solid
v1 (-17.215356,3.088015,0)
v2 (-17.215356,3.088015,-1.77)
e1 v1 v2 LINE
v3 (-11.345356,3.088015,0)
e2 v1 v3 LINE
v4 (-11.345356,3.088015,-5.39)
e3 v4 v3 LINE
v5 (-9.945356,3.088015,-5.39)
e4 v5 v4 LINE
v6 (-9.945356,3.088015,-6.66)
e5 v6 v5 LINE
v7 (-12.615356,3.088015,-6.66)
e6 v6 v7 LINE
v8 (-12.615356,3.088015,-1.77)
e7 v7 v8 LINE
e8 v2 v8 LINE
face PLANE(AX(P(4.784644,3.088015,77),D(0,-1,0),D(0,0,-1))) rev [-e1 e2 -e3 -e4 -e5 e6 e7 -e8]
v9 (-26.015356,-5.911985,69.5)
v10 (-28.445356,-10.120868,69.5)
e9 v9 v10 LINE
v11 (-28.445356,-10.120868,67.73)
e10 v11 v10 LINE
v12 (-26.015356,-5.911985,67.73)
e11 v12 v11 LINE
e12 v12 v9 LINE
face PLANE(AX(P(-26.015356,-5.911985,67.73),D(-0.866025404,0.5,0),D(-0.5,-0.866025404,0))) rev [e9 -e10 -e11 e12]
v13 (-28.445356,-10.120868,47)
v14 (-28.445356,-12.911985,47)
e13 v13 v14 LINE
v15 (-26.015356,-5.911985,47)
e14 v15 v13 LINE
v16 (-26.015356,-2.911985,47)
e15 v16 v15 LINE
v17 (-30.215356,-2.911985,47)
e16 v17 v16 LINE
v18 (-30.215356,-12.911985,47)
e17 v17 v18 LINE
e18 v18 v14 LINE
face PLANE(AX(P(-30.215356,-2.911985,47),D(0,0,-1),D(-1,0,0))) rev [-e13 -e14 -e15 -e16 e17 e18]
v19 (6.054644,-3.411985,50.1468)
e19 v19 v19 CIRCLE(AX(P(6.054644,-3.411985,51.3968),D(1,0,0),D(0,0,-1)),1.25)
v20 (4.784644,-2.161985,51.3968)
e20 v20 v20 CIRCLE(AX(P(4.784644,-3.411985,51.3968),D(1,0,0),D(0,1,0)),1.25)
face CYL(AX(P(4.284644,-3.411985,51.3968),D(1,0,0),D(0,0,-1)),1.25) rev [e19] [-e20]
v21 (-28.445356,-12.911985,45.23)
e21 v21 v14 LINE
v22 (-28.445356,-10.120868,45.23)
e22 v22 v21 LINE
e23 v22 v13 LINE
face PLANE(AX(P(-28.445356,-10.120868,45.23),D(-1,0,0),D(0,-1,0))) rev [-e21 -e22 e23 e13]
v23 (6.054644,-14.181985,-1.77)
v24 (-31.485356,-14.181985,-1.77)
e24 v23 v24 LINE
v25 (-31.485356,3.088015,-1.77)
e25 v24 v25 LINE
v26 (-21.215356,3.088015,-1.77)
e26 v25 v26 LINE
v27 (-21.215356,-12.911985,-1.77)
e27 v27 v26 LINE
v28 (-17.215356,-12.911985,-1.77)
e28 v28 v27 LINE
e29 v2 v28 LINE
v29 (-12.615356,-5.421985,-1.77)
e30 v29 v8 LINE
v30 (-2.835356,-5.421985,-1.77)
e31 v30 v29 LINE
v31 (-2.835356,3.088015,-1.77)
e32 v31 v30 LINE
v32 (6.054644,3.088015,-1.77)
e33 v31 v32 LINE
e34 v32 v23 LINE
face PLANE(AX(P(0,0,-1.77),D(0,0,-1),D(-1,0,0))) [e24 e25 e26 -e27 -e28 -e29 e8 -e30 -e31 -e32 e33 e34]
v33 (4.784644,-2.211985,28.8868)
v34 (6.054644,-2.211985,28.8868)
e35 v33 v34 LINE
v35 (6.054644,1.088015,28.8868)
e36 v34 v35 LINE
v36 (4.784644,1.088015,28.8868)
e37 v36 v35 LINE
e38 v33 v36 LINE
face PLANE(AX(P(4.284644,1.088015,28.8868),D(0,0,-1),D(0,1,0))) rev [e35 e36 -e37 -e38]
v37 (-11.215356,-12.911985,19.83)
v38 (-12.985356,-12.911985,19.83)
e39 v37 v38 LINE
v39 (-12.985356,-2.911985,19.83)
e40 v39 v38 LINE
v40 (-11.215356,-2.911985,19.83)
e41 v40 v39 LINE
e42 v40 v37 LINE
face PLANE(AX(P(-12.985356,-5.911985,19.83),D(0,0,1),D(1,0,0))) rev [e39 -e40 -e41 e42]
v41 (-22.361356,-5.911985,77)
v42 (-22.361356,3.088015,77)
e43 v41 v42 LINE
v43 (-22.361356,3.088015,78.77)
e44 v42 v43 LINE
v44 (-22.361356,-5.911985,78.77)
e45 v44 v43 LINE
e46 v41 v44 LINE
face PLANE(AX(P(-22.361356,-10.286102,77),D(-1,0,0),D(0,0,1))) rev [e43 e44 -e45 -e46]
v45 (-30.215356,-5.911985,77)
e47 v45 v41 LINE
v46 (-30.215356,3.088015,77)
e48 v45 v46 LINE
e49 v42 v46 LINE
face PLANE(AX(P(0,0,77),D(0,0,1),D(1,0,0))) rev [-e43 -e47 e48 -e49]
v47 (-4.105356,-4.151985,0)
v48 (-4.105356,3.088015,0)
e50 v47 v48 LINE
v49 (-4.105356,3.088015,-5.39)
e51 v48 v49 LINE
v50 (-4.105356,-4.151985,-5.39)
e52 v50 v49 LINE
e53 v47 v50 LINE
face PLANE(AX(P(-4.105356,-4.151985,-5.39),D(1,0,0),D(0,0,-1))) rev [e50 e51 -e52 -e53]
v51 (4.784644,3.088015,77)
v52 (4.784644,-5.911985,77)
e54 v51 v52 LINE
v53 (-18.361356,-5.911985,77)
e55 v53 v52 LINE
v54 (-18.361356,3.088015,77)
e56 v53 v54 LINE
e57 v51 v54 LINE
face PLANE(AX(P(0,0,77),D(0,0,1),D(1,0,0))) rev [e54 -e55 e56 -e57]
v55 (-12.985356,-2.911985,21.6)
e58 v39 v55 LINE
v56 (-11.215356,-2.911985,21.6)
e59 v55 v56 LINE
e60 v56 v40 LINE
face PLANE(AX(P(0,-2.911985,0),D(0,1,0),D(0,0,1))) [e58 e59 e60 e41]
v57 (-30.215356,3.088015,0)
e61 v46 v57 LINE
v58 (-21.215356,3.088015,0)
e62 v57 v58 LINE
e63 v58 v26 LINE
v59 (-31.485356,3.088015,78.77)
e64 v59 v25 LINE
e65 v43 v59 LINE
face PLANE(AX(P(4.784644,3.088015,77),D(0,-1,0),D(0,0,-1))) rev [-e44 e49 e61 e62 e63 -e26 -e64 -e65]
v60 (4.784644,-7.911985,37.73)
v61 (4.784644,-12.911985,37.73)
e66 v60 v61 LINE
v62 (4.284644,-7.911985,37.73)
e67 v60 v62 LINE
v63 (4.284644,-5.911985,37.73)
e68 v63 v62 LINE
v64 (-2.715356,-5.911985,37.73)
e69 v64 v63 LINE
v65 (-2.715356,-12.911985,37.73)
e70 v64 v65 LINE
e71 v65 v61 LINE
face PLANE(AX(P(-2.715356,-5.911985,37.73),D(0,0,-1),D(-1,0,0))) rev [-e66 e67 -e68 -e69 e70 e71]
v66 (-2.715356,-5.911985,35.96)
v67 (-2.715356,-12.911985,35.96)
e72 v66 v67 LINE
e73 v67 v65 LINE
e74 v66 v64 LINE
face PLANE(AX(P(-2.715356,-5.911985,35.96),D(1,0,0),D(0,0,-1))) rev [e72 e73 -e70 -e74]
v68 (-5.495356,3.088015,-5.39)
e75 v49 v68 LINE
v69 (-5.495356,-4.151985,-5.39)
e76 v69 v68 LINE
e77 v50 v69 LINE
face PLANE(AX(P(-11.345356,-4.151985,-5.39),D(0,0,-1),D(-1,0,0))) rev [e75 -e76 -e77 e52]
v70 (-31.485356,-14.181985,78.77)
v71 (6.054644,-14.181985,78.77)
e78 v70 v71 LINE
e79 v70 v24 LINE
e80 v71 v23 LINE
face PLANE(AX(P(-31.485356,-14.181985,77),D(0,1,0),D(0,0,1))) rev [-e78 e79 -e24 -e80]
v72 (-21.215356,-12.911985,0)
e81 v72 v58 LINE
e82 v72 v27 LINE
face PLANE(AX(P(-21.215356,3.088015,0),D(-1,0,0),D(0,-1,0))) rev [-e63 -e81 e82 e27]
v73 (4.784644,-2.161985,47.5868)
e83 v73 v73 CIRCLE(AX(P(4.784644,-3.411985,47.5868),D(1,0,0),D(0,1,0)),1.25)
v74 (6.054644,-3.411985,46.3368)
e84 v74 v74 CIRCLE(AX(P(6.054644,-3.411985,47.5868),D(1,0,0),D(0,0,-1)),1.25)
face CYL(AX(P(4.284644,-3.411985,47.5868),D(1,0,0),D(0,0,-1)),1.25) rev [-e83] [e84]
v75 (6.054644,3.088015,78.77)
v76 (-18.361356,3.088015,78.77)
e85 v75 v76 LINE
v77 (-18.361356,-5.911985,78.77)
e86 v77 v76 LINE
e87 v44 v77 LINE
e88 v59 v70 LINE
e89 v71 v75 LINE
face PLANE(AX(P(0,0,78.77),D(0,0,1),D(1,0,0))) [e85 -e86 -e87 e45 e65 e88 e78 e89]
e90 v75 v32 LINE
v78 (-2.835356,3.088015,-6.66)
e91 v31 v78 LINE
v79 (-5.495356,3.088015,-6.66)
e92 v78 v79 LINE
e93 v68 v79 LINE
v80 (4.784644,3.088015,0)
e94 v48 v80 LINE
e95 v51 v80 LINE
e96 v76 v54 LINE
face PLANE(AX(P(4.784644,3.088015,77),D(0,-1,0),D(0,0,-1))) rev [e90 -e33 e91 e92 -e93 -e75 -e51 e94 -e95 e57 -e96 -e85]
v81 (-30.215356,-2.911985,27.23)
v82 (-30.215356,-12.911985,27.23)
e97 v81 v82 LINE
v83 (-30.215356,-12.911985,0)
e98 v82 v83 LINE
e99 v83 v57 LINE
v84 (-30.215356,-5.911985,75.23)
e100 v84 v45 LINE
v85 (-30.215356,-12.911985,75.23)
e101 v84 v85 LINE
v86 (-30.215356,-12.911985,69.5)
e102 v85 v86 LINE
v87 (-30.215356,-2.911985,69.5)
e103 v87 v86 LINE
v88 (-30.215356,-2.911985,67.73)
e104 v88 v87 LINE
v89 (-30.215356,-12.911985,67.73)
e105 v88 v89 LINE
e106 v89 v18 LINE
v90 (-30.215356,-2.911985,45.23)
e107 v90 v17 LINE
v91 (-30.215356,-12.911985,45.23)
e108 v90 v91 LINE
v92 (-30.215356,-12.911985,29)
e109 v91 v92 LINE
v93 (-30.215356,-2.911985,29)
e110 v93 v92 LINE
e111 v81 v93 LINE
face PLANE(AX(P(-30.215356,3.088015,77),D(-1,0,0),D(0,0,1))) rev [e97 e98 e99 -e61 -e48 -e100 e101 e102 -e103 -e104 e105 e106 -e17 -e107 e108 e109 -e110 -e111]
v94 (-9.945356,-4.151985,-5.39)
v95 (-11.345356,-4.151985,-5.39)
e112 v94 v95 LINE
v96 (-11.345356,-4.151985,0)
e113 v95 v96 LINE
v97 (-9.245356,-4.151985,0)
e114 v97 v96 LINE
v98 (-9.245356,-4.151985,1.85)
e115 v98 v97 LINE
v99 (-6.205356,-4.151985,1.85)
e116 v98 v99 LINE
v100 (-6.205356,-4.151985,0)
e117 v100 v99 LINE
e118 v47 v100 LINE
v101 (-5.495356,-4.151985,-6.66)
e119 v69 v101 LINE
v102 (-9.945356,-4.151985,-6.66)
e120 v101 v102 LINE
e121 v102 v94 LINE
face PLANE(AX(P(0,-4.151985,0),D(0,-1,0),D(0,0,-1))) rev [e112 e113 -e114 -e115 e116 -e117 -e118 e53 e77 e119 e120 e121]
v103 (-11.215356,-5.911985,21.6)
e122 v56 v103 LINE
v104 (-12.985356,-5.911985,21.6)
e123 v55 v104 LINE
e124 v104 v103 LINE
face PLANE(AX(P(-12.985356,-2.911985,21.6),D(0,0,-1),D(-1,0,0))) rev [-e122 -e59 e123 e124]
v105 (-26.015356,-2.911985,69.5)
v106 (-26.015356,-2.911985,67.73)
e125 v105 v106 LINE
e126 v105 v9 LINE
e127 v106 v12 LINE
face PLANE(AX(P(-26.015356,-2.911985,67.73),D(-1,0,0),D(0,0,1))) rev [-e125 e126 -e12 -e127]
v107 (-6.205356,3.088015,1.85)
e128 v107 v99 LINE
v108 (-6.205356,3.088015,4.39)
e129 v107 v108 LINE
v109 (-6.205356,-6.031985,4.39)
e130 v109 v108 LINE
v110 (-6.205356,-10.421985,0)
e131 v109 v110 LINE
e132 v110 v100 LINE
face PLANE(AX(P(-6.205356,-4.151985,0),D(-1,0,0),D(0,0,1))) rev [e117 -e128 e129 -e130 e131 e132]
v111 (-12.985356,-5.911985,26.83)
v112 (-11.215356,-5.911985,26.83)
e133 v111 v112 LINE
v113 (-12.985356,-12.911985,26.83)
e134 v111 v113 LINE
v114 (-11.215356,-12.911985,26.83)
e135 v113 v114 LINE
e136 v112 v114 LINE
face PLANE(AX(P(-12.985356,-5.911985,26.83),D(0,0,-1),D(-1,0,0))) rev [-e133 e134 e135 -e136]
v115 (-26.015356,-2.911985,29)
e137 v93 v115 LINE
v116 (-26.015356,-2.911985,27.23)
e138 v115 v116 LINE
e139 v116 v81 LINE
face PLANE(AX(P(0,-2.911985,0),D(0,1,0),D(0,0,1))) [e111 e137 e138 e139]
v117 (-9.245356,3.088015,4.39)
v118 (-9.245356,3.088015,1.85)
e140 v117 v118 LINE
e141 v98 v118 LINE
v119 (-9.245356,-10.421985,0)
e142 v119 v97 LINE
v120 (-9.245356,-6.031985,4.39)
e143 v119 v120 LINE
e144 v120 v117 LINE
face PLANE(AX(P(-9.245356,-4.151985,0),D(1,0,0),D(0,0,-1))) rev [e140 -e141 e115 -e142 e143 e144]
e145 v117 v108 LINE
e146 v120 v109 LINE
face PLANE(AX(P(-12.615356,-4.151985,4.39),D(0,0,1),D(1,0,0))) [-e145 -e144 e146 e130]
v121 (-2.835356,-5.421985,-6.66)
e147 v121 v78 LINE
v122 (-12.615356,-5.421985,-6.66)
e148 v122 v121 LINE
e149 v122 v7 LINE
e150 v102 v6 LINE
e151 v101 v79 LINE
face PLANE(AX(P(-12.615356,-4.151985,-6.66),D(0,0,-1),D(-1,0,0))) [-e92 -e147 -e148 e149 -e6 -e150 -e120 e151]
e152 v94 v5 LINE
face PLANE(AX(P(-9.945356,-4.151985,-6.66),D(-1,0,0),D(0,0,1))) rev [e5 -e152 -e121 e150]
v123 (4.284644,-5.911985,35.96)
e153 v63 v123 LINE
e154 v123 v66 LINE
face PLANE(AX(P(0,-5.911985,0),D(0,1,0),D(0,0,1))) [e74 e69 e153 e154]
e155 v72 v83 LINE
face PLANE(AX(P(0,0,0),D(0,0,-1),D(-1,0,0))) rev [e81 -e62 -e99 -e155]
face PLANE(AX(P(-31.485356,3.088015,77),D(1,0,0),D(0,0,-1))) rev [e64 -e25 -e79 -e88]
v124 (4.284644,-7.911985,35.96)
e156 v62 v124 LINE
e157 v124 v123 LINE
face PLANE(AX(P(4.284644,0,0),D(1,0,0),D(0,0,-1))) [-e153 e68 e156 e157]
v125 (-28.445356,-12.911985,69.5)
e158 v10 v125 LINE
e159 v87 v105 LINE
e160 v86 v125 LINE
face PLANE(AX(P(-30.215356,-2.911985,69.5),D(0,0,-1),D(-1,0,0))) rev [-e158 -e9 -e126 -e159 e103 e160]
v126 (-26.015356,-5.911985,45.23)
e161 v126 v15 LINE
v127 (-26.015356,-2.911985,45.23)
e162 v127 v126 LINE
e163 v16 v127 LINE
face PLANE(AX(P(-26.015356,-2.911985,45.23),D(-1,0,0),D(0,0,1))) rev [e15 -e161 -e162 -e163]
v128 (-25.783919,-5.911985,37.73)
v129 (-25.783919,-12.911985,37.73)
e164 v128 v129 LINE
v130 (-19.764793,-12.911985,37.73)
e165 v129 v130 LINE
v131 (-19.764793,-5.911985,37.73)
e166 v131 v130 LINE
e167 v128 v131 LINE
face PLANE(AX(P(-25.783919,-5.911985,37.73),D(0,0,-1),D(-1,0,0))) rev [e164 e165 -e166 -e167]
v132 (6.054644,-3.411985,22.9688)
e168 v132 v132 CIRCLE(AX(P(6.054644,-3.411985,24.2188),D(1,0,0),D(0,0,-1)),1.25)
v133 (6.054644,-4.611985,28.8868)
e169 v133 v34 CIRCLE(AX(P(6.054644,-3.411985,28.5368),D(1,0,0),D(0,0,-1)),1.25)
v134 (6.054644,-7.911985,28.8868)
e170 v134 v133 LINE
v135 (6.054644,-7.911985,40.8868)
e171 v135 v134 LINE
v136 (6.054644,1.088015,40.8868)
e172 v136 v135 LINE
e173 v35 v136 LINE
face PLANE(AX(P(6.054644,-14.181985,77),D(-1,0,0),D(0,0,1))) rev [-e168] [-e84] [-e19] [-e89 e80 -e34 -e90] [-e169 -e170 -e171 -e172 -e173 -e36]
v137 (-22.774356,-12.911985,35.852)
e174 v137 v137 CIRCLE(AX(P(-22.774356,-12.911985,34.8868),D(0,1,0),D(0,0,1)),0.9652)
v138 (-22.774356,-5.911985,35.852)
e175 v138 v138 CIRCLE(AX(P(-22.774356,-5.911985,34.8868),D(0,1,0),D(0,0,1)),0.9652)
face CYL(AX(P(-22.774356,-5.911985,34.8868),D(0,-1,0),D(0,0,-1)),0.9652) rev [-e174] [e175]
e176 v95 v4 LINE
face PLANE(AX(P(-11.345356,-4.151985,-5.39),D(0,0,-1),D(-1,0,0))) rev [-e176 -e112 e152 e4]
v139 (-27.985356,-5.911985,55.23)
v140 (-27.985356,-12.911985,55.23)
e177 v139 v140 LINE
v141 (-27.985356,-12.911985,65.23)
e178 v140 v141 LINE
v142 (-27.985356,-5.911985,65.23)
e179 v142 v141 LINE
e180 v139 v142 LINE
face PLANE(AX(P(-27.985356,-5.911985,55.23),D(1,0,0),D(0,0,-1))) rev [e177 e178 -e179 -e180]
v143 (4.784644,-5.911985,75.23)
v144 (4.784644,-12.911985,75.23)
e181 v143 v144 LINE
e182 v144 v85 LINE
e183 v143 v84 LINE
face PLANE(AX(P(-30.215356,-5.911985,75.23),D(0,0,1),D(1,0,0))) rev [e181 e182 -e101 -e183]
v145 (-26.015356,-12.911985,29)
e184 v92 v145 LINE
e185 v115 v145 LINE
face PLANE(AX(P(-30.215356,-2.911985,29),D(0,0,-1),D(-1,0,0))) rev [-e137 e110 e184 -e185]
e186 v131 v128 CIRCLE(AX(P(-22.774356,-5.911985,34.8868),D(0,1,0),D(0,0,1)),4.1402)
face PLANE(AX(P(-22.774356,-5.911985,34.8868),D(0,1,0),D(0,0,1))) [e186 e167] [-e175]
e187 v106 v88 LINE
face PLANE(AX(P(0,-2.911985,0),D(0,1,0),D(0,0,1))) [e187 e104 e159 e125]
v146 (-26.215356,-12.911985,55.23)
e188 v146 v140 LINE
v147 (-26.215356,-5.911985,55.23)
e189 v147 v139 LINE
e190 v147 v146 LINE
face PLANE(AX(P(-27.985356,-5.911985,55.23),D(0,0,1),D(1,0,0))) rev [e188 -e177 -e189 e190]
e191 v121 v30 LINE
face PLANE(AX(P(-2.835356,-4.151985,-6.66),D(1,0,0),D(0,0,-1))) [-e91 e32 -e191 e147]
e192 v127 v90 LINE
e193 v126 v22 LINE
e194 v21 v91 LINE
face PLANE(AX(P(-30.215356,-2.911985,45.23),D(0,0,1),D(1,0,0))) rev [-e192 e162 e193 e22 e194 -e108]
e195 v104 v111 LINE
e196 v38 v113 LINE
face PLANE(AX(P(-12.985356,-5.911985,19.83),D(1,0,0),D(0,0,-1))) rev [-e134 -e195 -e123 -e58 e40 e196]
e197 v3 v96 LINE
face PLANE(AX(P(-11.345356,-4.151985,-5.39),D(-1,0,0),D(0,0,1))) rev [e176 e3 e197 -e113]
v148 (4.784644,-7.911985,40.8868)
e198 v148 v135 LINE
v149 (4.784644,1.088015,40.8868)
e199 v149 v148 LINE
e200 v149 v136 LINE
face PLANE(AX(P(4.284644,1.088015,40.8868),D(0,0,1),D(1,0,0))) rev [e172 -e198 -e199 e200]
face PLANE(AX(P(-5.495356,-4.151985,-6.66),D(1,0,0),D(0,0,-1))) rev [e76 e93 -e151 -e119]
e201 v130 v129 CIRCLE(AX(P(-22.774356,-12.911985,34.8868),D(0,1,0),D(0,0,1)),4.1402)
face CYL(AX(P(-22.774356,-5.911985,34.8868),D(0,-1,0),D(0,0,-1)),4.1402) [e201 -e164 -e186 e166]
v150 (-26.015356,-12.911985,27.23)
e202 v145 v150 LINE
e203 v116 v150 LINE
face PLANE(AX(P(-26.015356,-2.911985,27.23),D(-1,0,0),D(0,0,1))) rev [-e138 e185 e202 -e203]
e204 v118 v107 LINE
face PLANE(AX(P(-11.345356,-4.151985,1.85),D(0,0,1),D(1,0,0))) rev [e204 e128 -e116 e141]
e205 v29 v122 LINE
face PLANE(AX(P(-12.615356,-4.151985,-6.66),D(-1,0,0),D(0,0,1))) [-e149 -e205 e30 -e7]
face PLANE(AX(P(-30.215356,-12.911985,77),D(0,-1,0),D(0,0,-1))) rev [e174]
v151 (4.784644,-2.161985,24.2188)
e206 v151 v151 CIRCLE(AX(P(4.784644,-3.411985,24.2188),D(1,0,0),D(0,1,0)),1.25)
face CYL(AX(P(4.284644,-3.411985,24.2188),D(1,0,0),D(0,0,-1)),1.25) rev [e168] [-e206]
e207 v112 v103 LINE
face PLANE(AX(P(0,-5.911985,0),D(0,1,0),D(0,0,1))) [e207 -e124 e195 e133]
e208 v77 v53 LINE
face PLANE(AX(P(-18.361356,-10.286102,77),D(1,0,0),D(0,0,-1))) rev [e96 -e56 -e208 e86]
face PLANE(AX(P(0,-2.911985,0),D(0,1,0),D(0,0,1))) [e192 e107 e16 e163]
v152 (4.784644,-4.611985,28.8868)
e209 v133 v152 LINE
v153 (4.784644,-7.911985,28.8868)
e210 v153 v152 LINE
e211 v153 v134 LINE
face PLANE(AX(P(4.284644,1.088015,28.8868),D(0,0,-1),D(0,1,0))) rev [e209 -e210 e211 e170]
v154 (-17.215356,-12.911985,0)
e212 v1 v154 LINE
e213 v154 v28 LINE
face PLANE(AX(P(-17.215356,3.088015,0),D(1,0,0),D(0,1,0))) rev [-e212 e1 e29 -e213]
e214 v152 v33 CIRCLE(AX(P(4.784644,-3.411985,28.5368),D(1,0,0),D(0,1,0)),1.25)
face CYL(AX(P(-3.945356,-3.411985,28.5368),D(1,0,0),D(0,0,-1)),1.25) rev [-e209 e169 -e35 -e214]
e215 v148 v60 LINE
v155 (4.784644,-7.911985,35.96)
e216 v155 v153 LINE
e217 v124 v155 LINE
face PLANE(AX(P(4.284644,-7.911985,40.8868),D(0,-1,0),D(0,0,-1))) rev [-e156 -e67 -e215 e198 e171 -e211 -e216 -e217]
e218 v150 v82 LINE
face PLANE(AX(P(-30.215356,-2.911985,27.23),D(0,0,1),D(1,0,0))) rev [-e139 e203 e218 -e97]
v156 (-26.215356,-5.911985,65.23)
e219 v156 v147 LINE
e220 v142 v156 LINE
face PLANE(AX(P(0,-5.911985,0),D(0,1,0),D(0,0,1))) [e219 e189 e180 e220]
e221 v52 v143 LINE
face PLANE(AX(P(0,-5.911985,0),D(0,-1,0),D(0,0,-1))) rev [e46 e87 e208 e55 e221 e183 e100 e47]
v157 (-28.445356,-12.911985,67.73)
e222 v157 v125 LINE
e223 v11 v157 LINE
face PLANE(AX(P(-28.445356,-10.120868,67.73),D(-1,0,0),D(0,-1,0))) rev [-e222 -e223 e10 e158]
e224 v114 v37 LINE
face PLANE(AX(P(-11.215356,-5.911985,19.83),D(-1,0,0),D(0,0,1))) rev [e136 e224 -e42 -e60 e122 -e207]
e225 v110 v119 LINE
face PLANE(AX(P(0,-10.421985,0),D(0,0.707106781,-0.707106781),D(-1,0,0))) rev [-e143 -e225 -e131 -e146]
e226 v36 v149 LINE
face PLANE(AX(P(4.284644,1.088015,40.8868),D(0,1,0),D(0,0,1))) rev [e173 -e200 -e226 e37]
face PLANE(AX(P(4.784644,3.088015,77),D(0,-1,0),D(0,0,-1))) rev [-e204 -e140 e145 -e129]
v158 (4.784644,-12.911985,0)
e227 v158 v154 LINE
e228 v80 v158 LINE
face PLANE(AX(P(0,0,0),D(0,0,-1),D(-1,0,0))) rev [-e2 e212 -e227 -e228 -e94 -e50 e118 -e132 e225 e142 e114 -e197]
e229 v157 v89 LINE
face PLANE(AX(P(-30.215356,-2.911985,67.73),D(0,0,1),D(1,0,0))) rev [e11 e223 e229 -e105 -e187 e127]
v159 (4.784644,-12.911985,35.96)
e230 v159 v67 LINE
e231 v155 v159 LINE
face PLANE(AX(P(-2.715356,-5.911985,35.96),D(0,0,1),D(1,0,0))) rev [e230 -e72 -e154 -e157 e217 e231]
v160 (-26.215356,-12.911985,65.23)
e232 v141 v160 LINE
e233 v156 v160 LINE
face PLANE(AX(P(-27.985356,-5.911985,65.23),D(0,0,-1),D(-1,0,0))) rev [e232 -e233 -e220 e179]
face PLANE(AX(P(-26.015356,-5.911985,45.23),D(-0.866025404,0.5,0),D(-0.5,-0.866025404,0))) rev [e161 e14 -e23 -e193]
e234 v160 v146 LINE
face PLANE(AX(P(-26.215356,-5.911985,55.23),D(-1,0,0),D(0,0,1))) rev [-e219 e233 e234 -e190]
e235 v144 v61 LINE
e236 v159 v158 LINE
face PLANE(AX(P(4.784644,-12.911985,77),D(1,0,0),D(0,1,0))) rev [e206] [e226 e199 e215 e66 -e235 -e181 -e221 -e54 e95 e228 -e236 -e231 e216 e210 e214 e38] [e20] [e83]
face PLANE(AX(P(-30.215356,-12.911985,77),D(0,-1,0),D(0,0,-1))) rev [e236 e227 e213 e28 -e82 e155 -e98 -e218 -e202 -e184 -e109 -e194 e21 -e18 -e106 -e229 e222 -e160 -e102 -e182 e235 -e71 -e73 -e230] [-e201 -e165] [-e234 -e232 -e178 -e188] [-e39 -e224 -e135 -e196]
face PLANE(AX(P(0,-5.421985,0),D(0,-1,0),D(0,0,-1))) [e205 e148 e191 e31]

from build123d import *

# Parameters (mm, degrees)
BOSS_EXTRUDE1_DEPTH            = 77
SKETCH3_W                      = 37.54
SKETCH3_H                      = 17.27
BOSS_EXTRUDE2_DEPTH            = 1.77
SKETCH4_W                      = 37.54
SKETCH4_H                      = 17.27
BOSS_EXTRUDE3_DEPTH            = 1.77
SKETCH5_W                      = 4
SKETCH5_H                      = 16
CUT_EXTRUDE2_DEPTH             = 1.77
SKETCH6_W                      = 9.78
SKETCH6_H                      = 11.05
SKETCH6_W_2                    = 7.24
SKETCH6_H_2                    = 7.24
BUTTON_WALLS_DEPTH             = 7.24
SKETCH7_W                      = 9.78
SKETCH7_H                      = 11.05
BUTTON_BOTTOM_DEPTH            = 1.27
SKETCH8_W                      = 7.24
SKETCH8_H                      = 1.77
BUTTON_CUTOUT_MIDDLE_DEPTH     = 7.24
SKETCH9_W                      = 4.45
SKETCH9_H                      = 1.27
SKETCH9_W_2                    = 3.37
SKETCH9_H_2                    = 4.39
BUTTON_CUTOUT_FRONT_BACK_DEPTH = 7.24
SKETCH10_W                     = 3.37
SKETCH10_H                     = 4.39
BUTTON_CUTOUT_BOTTOM_DEPTH     = 1.27
BUTTON_CHAMFER1_SIZE           = 5
SKETCH12_W                     = 35
SKETCH12_H                     = 1.77
SKETCH12_W_2                   = 1.77
SKETCH12_H_2                   = 10
SKETCH12_W_3                   = 7.5
SKETCH12_R                     = 0.9652
SKETCH12_H_3                   = 7
SUPPORT_PCB_BATTERY_DEPTH      = 7
SKETCH13_R                     = 1.25
SKETCH13_W                     = 12
SKETCH13_H                     = 9
CUTOUT_USB_3_LEDS_DEPTH        = 1.77
SKETCH16_W                     = 1.77
SKETCH16_H                     = 1.77
TAB_PCB_RETAINER_LEN_DEPTH     = 3
SKETCH17_W                     = 4
SKETCH17_H                     = 1.77
CUTOUT_BACK_MOT_WIRES_DEPTH    = 9
SKETCH18_R                     = 1.25
CUTOUT_CHG_DONE_LED_DEPTH      = 10
SKETCH19_W                     = 4.2
SKETCH19_H                     = 1.77
TAB_PCB_RETAINERS_WIDTH_DEPTH  = 10
CUTOUT_RETAINER_TAB_1_DEPTH    = 1.77
CUTOUT_RETAINER_TAB_2_DEPTH    = 1.77


with BuildPart() as part:
    # Sketch2 → Boss-Extrude1 (new body)
    with BuildSketch(Plane.XY):
        Polygon((-30.215355805, 3.088014981), (-30.215355805, -12.911985019), (4.784644195, -12.911985019), (4.784644195, 3.088014981), (6.054644195, 3.088014981), (6.054644195, -14.181985019), (-31.485355805, -14.181985019), (-31.485355805, 3.088014981), align=None)
    extrude(amount=BOSS_EXTRUDE1_DEPTH)

    # Sketch3 → Boss-Extrude2 (add)
    with BuildSketch(Plane.XY.offset(77)):
        with Locations((-12.715355805, -5.546985019)):
            Rectangle(SKETCH3_W, SKETCH3_H)
    extrude(amount=BOSS_EXTRUDE2_DEPTH)

    # Sketch4 → Boss-Extrude3 (add)
    with BuildSketch(Plane(origin=(0, 0, 0), x_dir=(-1, 0, 0), z_dir=(0, 0, -1))):
        with Locations((12.715355805, -5.546985019)):
            Rectangle(SKETCH4_W, SKETCH4_H)
    extrude(amount=BOSS_EXTRUDE3_DEPTH)

    # Sketch5 → Cut-Extrude2 (cut)
    with BuildSketch(Plane(origin=(0, 0, -1.77), x_dir=(-1, 0, 0), z_dir=(0, 0, -1))):
        with Locations((19.215355805, -4.911985019)):
            Rectangle(SKETCH5_W, SKETCH5_H)
    extrude(amount=-CUT_EXTRUDE2_DEPTH, mode=Mode.SUBTRACT)

    # Sketch6 → button_walls (add)
    with BuildSketch(Plane(origin=(0, 3.088014981, 0), x_dir=(1, 0, 0), z_dir=(0, 1, 0))):
        with Locations((-7.725355805, 1.135)):
            Rectangle(SKETCH6_W, SKETCH6_H)
        with Locations((-7.725355805, 1.77)):
            Rectangle(SKETCH6_W_2, SKETCH6_H_2, mode=Mode.SUBTRACT)
    extrude(amount=-BUTTON_WALLS_DEPTH)

    # Sketch7 → button_bottom (add)
    with BuildSketch(Plane.XZ.offset(4.151985019)):
        with Locations((-7.725355805, -1.135)):
            Rectangle(SKETCH7_W, SKETCH7_H)
    extrude(amount=BUTTON_BOTTOM_DEPTH)

    # Sketch8 → button_cutout_middle (cut)
    with BuildSketch(Plane(origin=(0, 3.088014981, 0), x_dir=(1, 0, 0), z_dir=(0, 1, 0))):
        with Locations((-7.725355805, 0.885)):
            Rectangle(SKETCH8_W, SKETCH8_H)
    extrude(amount=-BUTTON_CUTOUT_MIDDLE_DEPTH, mode=Mode.SUBTRACT)

    # Sketch9 → button_cutout_front_back (cut)
    with BuildSketch(Plane(origin=(0, 3.088014981, 0), x_dir=(1, 0, 0), z_dir=(0, 1, 0))):
        with Locations((-7.720355805, 6.025)):
            Rectangle(SKETCH9_W, SKETCH9_H)
        with Locations((-10.930355805, -2.195)):
            Rectangle(SKETCH9_W_2, SKETCH9_H_2)
        with Locations((-4.520355805, -2.195)):
            Rectangle(SKETCH9_W_2, SKETCH9_H_2)
    extrude(amount=-BUTTON_CUTOUT_FRONT_BACK_DEPTH, mode=Mode.SUBTRACT)

    # Sketch10 → button_cutout_bottom (cut)
    with BuildSketch(Plane(origin=(0, -4.151985019, 0), x_dir=(1, 0, 0), z_dir=(0, 1, 0))):
        with Locations((-10.930355805, -2.195)):
            Rectangle(SKETCH10_W, SKETCH10_H)
        with Locations((-4.520355805, -2.195)):
            Rectangle(SKETCH10_W, SKETCH10_H)
    extrude(amount=-BUTTON_CUTOUT_BOTTOM_DEPTH, mode=Mode.SUBTRACT)

    # button_Chamfer1
    # the kernel refuses this chamfer: 5 mm, written as the material it adds along each edge
    with BuildSketch(Plane(origin=(-6.205355805, -5.421985019, 0), x_dir=(0, -0.9996219169112968, -0.027495876610586372), z_dir=(-1, 0, 0))) as button_chamfer1_piece_1_section:
        Polygon((BUTTON_CHAMFER1_SIZE * 0.999621916911, BUTTON_CHAMFER1_SIZE * 0.0274958766106), (-BUTTON_CHAMFER1_SIZE * 0.0274958766106, BUTTON_CHAMFER1_SIZE * 0.999621916911), (0, 0), align=None)
    button_chamfer1_piece_1 = extrude(amount=3.04, mode=Mode.PRIVATE)
    button_chamfer1_piece_1 = split(button_chamfer1_piece_1, bisect_by=Plane(origin=(-7.725355805, -7.110612501, 4.39), z_dir=(0, 0, -1)), keep=Keep.TOP, mode=Mode.PRIVATE)
    add(button_chamfer1_piece_1)

    # Sketch12 → support_pcb_battery (add)
    # profile 1 of 5: a face of its own
    with BuildSketch(Plane(origin=(0, -12.911985019, 0), x_dir=(1, 0, 0), z_dir=(0, 1, 0))):
        with Locations((-12.715355805, -76.115)):
            Rectangle(SKETCH12_W, SKETCH12_H)
    # profile 2 of 5: a face of its own
    with BuildSketch(Plane(origin=(0, -12.911985019, 0), x_dir=(1, 0, 0), z_dir=(0, 1, 0))):
        with Locations((-27.100355805, -60.23)):
            Rectangle(SKETCH12_W_2, SKETCH12_H_2)
    # profile 3 of 5: a face of its own
    with BuildSketch(Plane(origin=(0, -12.911985019, 0), x_dir=(1, 0, 0), z_dir=(0, 1, 0))):
        with Locations((1.034644195, -36.845)):
            Rectangle(SKETCH12_W_3, SKETCH12_H)
    # profile 4 of 5: a face of its own
    with BuildSketch(Plane(origin=(0, -12.911985019, 0), x_dir=(1, 0, 0), z_dir=(0, 1, 0))):
        with BuildLine():
            Line((-25.783918863, -37.73), (-19.764792747, -37.73))
            ThreePointArc((-19.764792747, -37.73), (-22.774355805, -30.7466), (-25.783918863, -37.73))
        make_face()
        with Locations(Location((-22.774355805, -34.8868, 0), (0, 0, 270))):
            Circle(SKETCH12_R, mode=Mode.SUBTRACT)
    # profile 5 of 5: a face of its own
    with BuildSketch(Plane(origin=(0, -12.911985019, 0), x_dir=(1, 0, 0), z_dir=(0, 1, 0))):
        with Locations((-12.100355805, -23.33)):
            Rectangle(SKETCH12_W_2, SKETCH12_H_3)
    extrude(amount=SUPPORT_PCB_BATTERY_DEPTH)

    # Sketch13 → cutout_usb_3_leds (cut)
    with BuildSketch(Plane(origin=(6.054644195, 0, 0), x_dir=(0, 0, -1), z_dir=(1, 0, 0))):
        with Locations((-51.3968, -3.411985019)):
            Circle(SKETCH13_R)
        with Locations((-47.5868, -3.411985019)):
            Circle(SKETCH13_R)
        with Locations((-24.2188, -3.411985019)):
            Circle(SKETCH13_R)
        with Locations((-34.8868, -3.411985019)):
            Rectangle(SKETCH13_W, SKETCH13_H)
    extrude(amount=-CUTOUT_USB_3_LEDS_DEPTH, mode=Mode.SUBTRACT)

    # Sketch16 → tab_pcb_retainer_len (add)
    with BuildSketch(Plane(origin=(0, -5.911985019, 0), x_dir=(1, 0, 0), z_dir=(0, 1, 0))):
        with Locations((-12.100355805, -20.715)):
            Rectangle(SKETCH16_W, SKETCH16_H)
    extrude(amount=TAB_PCB_RETAINER_LEN_DEPTH)

    # Sketch17 → cutout_back_mot_wires (cut)
    with BuildSketch(Plane(origin=(0, 3.088014981, 0), x_dir=(1, 0, 0), z_dir=(0, 1, 0))):
        with Locations((-20.361355805, -77.885)):
            Rectangle(SKETCH17_W, SKETCH17_H)
    extrude(amount=-CUTOUT_BACK_MOT_WIRES_DEPTH, mode=Mode.SUBTRACT)

    # Sketch18 → cutout_chg_done_led (cut)
    with BuildSketch(Plane(origin=(6.054644195, 0, 0), x_dir=(0, 0, -1), z_dir=(1, 0, 0))):
        with Locations((-28.5368, -3.411985019)):
            Circle(SKETCH18_R)
    extrude(amount=-CUTOUT_CHG_DONE_LED_DEPTH, mode=Mode.SUBTRACT)

    # Sketch19 → tab_pcb_retainers_width (add)
    with BuildSketch(Plane(origin=(0, -12.911985019, 0), x_dir=(1, 0, 0), z_dir=(0, 1, 0))):
        with Locations((-28.115355805, -68.615)):
            Rectangle(SKETCH19_W, SKETCH19_H)
        with Locations((-28.115355805, -46.115)):
            Rectangle(SKETCH19_W, SKETCH19_H)
        with Locations((-28.115355805, -28.115)):
            Rectangle(SKETCH19_W, SKETCH19_H)
    extrude(amount=TAB_PCB_RETAINERS_WIDTH_DEPTH)

    # Sketch20 → cutout_retainer_tab_1 (cut)
    with BuildSketch(Plane.XY.offset(69.5)):
        Polygon((-26.015355805, -12.911985019), (-26.015355805, -5.911985019), (-28.445355805, -10.120868481), (-28.445355805, -12.911985019), align=None)
    extrude(amount=-CUTOUT_RETAINER_TAB_1_DEPTH, mode=Mode.SUBTRACT)

    # Sketch21 → cutout_retainer_tab_2 (cut)
    with BuildSketch(Plane.XY.offset(47)):
        Polygon((-26.015355805, -5.911985019), (-28.445355805, -10.120868481), (-28.445355805, -12.911985019), (-26.015355805, -12.911985019), align=None)
    extrude(amount=-CUTOUT_RETAINER_TAB_2_DEPTH, mode=Mode.SUBTRACT)


solid = part.part
